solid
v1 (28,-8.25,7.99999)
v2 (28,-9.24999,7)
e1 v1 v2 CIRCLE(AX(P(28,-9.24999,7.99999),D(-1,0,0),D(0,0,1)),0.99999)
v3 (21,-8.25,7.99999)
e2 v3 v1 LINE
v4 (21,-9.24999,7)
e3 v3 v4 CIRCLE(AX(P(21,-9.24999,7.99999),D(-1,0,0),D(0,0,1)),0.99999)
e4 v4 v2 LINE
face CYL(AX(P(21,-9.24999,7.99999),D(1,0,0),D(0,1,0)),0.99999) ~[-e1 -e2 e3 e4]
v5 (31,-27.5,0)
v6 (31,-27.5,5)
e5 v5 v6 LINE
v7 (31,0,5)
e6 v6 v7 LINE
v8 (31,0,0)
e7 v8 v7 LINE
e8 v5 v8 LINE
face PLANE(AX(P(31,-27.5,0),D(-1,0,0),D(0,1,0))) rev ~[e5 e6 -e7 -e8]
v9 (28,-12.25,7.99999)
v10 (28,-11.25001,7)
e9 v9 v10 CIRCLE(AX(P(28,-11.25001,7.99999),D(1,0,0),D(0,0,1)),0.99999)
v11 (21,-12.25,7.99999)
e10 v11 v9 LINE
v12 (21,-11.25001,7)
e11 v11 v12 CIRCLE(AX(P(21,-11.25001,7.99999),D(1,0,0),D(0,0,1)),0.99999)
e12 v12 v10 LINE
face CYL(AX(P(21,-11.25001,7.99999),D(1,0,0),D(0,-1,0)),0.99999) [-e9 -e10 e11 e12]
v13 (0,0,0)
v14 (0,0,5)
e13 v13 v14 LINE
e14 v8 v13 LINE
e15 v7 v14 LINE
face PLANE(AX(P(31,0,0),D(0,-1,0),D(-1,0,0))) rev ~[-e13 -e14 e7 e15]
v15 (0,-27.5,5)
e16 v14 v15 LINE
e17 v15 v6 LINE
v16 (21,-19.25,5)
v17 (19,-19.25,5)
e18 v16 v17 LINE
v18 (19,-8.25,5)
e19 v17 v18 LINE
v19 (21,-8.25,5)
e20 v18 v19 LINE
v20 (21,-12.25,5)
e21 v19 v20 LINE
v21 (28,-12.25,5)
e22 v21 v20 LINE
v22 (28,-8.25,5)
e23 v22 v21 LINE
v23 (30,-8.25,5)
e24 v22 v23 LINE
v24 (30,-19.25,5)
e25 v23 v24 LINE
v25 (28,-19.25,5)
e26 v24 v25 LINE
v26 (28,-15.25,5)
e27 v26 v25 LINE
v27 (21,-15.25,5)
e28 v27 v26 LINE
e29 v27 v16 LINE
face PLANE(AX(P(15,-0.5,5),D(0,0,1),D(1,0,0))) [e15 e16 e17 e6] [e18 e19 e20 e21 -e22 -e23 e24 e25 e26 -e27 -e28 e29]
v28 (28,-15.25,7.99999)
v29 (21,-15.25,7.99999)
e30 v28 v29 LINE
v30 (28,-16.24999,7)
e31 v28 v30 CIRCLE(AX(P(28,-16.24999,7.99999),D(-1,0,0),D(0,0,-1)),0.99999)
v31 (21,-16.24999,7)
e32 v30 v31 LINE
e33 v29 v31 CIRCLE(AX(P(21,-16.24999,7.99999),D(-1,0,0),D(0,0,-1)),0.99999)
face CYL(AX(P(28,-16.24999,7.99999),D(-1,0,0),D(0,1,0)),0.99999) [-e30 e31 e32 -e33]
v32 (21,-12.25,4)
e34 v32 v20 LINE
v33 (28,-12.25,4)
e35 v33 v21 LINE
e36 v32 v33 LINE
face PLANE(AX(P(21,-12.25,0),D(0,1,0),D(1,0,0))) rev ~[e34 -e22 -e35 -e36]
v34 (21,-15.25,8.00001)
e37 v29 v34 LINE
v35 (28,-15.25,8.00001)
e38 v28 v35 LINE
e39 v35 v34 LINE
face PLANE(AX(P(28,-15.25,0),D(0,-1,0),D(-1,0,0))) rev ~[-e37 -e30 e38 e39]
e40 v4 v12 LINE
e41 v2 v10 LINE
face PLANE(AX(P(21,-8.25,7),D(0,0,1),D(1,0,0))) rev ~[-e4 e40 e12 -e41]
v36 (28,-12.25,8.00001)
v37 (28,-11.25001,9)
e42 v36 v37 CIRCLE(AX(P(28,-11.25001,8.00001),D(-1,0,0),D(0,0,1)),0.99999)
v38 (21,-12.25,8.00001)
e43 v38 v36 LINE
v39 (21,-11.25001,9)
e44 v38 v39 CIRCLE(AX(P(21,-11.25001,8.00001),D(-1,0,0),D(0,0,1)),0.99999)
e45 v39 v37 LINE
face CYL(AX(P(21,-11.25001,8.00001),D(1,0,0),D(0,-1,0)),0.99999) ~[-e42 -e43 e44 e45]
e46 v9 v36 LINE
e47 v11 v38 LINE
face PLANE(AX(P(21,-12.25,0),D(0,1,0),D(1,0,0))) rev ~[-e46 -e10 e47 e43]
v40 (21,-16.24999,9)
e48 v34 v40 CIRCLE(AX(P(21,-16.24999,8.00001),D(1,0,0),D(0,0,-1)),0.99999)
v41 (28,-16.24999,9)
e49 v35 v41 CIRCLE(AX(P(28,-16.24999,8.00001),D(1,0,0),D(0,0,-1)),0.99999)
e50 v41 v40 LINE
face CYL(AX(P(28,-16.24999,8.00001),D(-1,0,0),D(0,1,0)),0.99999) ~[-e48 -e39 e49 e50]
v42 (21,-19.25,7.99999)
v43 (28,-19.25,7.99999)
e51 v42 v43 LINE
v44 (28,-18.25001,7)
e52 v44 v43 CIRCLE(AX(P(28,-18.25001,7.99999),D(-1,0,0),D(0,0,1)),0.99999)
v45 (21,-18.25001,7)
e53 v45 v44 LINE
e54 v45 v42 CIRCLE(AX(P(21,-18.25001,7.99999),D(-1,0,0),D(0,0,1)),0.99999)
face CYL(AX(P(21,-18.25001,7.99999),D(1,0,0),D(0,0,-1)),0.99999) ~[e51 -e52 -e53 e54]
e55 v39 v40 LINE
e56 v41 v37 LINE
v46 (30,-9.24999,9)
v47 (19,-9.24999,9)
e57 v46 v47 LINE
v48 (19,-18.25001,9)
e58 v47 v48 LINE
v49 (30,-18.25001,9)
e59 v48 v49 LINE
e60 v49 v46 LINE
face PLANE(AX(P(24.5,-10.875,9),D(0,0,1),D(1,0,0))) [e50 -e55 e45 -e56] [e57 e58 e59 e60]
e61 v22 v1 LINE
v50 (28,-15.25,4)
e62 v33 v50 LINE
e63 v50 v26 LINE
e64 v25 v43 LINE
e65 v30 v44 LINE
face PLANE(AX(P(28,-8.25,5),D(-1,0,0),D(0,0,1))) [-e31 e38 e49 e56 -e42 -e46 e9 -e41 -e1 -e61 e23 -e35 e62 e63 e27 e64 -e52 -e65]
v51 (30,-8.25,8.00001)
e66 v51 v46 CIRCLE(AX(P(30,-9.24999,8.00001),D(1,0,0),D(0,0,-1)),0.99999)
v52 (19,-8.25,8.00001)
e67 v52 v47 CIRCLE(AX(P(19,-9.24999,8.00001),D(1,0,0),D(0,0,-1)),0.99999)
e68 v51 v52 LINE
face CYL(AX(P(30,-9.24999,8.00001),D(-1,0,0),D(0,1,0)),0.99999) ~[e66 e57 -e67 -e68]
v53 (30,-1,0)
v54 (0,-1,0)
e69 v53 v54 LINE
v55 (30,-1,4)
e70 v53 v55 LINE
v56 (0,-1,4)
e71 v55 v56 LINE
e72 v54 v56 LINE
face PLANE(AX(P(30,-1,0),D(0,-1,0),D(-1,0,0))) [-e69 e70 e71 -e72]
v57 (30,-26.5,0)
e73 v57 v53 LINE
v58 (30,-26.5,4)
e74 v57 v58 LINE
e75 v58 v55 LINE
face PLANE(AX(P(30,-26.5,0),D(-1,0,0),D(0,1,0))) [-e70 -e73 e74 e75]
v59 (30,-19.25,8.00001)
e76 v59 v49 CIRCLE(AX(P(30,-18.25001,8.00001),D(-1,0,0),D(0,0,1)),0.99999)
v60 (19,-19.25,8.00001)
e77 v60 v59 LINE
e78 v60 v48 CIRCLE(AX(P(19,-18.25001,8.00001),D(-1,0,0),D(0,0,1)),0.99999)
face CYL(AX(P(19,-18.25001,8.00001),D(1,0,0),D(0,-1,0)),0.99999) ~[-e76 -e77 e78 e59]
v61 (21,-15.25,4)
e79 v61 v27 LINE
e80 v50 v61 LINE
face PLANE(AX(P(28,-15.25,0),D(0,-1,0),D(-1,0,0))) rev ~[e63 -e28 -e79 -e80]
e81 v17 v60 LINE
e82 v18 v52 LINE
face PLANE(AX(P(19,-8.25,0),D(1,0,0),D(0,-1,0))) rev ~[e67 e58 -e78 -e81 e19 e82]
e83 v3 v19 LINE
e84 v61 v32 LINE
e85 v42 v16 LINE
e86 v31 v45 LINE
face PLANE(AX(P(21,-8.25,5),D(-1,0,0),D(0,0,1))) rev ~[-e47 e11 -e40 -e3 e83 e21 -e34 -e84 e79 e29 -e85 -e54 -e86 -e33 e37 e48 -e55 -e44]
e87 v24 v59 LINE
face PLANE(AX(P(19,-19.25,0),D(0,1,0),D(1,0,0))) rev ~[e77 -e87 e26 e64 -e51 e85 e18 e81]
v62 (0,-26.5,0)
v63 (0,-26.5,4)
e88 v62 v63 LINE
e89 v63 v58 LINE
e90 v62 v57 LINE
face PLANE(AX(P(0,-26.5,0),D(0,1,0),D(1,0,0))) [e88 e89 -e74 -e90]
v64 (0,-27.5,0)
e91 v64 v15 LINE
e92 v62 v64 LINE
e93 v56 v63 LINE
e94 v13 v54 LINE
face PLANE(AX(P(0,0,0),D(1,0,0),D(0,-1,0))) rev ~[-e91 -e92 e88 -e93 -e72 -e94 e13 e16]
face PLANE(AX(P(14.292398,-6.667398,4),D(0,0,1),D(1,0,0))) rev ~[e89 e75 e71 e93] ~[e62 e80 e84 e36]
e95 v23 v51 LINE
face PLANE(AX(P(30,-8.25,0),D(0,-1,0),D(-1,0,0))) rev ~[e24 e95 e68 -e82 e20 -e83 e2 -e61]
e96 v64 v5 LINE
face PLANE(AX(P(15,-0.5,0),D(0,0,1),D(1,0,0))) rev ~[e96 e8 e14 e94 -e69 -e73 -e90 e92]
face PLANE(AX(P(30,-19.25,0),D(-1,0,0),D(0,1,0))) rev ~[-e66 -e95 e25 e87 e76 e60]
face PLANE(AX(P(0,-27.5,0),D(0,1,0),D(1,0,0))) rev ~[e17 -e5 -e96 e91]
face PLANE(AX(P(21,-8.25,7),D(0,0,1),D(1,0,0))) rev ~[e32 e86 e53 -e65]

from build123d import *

# Parameters (mm, degrees)
F0_W     = 30
F0_H     = 1
F1_DEPTH = 5
F2_DEPTH = 9
F3_DEPTH = 4
F4_W     = 3.5
F4_H     = 2
F5_DEPTH = 25
F6_R     = 0.99999


# Not quite as in the source:
# - a fillet or chamfer is up to 0.001 mm smaller than in the source, because OpenCascade refuses the exact size


with BuildPart() as f1:
    # F0 (on Top) → F1 (new body)
    with BuildSketch(Plane.XY):
        with Locations((15, -0.5)):
            Rectangle(F0_W, F0_H)
        Polygon((31, 0), (30, 0), (30, -1), (30, -8.25), (30, -13.75), (30, -19.25), (30, -26.5), (30, -27.5), (31, -27.5), align=None)
        with Locations((15, -27)):
            Rectangle(F0_W, F0_H)
        Polygon((30, -1), (0, -1), (0, -13.75), (19, -13.75), (19, -8.25), (30, -8.25), align=None)
        Polygon((19, -13.75), (0, -13.75), (0, -26.5), (30, -26.5), (30, -19.25), (19, -19.25), align=None)
    extrude(amount=F1_DEPTH)

    # F0 (on Top) → F2 (join)
    with BuildSketch(Plane.XY):
        Polygon((30, -13.75), (30, -8.25), (19, -8.25), (19, -13.75), (21, -13.75), (21, -12.25), (28, -12.25), (28, -13.75), align=None)
        Polygon((21, -13.75), (19, -13.75), (19, -19.25), (30, -19.25), (30, -13.75), (28, -13.75), (28, -15.25), (21, -15.25), align=None)
    extrude(amount=F2_DEPTH)

    # F0 (on Top) → F3 (cut)
    with BuildSketch(Plane.XY):
        Polygon((30, -1), (0, -1), (0, -13.75), (19, -13.75), (19, -8.25), (30, -8.25), align=None)
        Polygon((19, -13.75), (0, -13.75), (0, -26.5), (30, -26.5), (30, -19.25), (19, -19.25), align=None)
        Polygon((21, -13.75), (19, -13.75), (19, -19.25), (30, -19.25), (30, -13.75), (28, -13.75), (28, -15.25), (21, -15.25), align=None)
        Polygon((30, -13.75), (30, -8.25), (19, -8.25), (19, -13.75), (21, -13.75), (21, -12.25), (28, -12.25), (28, -13.75), align=None)
    extrude(amount=F3_DEPTH, mode=Mode.SUBTRACT)

    # F4 (on face) → F5 (cut)
    with BuildSketch(Plane(origin=(0, -8.25, 0), x_dir=(-1, 0, 0), z_dir=(0, 1, 0))):
        with Locations((-26.25, 6)):
            Rectangle(F4_W, F4_H)
        with Locations((-22.75, 6)):
            Rectangle(F4_W, F4_H)
    extrude(amount=-F5_DEPTH, mode=Mode.SUBTRACT)

    # F6 (radius 1 in the source; OpenCascade refuses exactly that, so slightly less here)
    f6_edges = [f1.edges().sort_by_distance(p)[0] for p in [
        (24.5, -19.25, 9),
        (24.5, -12.25, 9),
        (24.5, -12.25, 7),
        (24.5, -8.25, 9),
        (24.5, -15.25, 9),
        (24.5, -15.25, 7),
        (24.5, -19.25, 7),
        (24.5, -8.25, 7),
    ]]
    fillet(f6_edges, radius=F6_R)


solid = f1.part
